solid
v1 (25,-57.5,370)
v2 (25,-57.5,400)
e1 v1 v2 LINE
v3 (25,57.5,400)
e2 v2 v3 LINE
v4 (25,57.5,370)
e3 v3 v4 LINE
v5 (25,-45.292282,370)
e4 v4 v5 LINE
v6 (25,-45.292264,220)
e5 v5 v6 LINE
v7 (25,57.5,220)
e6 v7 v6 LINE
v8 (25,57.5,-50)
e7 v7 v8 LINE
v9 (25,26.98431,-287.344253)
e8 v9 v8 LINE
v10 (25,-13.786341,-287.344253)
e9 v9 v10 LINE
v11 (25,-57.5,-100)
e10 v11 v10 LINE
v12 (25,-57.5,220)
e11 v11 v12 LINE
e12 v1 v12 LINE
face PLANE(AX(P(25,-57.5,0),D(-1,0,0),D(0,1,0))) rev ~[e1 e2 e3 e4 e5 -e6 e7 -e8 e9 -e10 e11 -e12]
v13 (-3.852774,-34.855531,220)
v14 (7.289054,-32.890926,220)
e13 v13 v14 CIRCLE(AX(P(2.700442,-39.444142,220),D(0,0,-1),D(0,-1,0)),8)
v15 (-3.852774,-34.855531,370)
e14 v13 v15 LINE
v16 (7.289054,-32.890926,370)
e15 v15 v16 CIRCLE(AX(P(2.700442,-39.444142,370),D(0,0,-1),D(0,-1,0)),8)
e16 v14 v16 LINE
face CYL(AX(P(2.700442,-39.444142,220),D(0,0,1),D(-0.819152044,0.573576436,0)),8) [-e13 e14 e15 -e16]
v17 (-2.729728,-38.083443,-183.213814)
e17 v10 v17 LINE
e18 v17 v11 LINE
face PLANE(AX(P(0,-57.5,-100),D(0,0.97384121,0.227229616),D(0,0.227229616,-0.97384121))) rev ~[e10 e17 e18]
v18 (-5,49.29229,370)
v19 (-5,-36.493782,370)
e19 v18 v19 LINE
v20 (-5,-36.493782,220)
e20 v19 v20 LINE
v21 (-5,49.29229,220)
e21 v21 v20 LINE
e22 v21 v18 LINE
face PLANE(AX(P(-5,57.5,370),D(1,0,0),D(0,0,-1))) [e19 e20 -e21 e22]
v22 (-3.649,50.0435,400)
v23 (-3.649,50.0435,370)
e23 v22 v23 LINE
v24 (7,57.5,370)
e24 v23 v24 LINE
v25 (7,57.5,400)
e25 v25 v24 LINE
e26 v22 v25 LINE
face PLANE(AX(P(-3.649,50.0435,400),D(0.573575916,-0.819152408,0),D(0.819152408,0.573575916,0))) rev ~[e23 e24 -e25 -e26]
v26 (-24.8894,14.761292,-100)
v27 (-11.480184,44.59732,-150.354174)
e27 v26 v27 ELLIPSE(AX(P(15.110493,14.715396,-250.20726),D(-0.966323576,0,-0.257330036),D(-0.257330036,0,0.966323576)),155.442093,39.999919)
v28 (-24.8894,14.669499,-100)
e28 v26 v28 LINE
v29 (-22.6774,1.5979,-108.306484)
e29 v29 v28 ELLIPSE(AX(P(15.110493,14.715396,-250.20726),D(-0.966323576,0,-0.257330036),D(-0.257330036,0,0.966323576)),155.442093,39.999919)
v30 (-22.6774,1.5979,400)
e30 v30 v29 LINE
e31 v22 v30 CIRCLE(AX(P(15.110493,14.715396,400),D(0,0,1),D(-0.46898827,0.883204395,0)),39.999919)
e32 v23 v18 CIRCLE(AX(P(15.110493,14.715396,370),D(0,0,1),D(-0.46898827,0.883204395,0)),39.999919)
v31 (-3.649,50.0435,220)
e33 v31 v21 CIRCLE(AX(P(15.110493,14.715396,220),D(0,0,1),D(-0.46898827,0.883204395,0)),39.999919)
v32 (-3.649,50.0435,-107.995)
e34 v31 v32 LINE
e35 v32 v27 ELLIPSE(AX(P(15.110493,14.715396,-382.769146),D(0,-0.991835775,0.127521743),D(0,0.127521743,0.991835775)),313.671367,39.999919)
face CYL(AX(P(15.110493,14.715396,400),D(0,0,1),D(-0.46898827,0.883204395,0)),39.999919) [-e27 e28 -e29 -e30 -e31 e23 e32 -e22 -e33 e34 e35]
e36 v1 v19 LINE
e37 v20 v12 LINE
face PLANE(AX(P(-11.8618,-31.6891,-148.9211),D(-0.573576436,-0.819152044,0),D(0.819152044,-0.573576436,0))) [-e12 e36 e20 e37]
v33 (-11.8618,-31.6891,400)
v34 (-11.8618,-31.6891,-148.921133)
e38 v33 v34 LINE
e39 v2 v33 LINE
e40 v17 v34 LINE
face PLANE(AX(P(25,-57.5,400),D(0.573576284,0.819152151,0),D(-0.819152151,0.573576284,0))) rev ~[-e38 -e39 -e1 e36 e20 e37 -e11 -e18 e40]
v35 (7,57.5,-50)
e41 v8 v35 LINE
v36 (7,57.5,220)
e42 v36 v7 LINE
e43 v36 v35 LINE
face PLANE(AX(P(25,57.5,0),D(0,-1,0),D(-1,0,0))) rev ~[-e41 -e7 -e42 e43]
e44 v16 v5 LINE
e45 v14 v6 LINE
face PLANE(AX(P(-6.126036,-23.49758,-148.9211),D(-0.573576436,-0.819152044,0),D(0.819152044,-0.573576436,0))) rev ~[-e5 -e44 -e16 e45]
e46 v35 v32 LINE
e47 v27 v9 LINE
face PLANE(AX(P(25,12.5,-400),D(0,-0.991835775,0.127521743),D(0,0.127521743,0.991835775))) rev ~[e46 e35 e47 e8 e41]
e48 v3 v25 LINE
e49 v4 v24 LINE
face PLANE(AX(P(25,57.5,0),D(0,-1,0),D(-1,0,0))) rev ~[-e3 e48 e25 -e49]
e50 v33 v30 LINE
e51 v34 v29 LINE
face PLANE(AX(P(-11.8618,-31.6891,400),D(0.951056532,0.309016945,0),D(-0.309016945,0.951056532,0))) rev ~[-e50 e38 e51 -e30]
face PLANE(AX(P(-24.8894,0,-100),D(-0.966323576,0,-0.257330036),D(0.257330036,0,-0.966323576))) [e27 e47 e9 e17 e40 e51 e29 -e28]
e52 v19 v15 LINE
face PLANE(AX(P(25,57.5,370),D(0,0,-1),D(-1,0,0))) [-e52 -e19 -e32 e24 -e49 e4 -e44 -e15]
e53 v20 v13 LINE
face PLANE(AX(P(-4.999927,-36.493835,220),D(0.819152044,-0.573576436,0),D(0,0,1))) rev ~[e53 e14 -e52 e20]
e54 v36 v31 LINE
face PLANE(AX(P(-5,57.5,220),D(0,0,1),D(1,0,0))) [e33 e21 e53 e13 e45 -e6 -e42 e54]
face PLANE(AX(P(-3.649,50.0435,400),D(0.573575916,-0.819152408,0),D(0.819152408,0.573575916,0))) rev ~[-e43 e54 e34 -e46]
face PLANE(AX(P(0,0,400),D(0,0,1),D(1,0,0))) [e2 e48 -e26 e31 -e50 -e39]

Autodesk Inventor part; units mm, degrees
ref_plane "YZ Plane" through (0, 0, 0) normal (1, 0, 0) x (0, 1, 0)
ref_plane "XZ Plane" through (0, 0, 0) normal (0, 1, 0) x (-1, 0, 0)
ref_plane "XY Plane" through (0, 0, 0) normal (0, 0, 1) x (1, 0, 0)
sketch "Sketch1" plane through (0, 0, 0) normal (0, 0, 1) x (1, 0, 0)
  line L0 (-25, -57.5) -> (25, -57.5)
  line L1 (25, -57.5) -> (25, 57.5)
  line L2 (25, 57.5) -> (-25, 57.5)
  line L3 (-25, 57.5) -> (-25, -57.5)
  line L4 (-25, -57.5) -> (25, 57.5) construction
  line L5 (25, -57.5) -> (-25, 57.5) construction
  point P0 (0, 0)
  dimension "d0" = 50
  dimension "d1" = 115
extrude "Extrusion1" add sketch "Sketch1" along normal mid plane 800
sketch "Sketch2" plane through (0, 0, 400) normal (0, 0, 1) x (1, 0, 0)
  line L0 (-25, -57.5) -> (25, -57.5) projected
  line L1 (25, -57.5) -> (25, 57.5) construction
  line L2 (25, 57.5) -> (-25, 57.5) projected
  line L3 (-25, 57.5) -> (-25, -57.5) projected
  line L4 (25, -57.5) -> (86.0387, -57.5) construction
  line L5 (-25, -57.5) -> (25, -57.5) projected
  line L6 (25, -57.5) -> (-11.8618, -31.6891)
  line L7 (25, -57.5) -> (70, -57.5) construction
  line L8 (-11.8618, -31.6891) -> (-22.6774, 1.5979)
  line L9 (-11.8618, -31.6891) -> (23.1382, -31.6891) construction
  arc A0 (-3.649, 50.0435) -> (-22.6774, 1.5979) centre (15.1106, 14.7153) ccw
  line L10 (-3.649, 50.0435) -> (7, 57.5)
  line L11 (-3.649, 50.0435) -> (9.351, 50.0435) construction
  line L12 (25, 57.5) -> (-25, 57.5) projected
  point P0 (0, 0)
  dimension "d5" = 45
  dimension "d6" = 145
  dimension "d7" = 35
  dimension "d8" = 108
  dimension "d9" = 40
  dimension "d10" = 13
  dimension "d11" = 35
  dimension "d12" = 18
extrude "Extrusion2" cut sketch "Sketch2" against normal through all
sketch "Sketch3" plane through (0, 0, 0) normal (1, 0, 0) x (0, 1, 0)
  line L0 (57.5, -400) -> (57.5, 400) projected
  line L1 (-57.5, 400) -> (57.5, 400) projected
  line L2 (-57.5, -400) -> (-57.5, 400) projected
  line L3 (57.5, -400) -> (-57.5, -400) projected
  line L4 (-57.5, -400) -> (-57.5, 400) projected
  line L5 (-57.5, -100) -> (12.5, -400)
  line L6 (57.5, -400) -> (-57.5, -400) projected
  point P0 (0, 0)
  dimension "d15" = 300
  dimension "d16" = 70
extrude "Extrusion3" cut sketch "Sketch3" along normal through all both and the other way through all contours L3 L2 L5
sketch "Sketch4" plane through (25, 57.5, 400) normal (1, 0, 0) x (0, 0, -1)
  line L0 (500, -115) -> (800, -45) projected
  line L1 (800, 0) -> (800, -45) projected
  line L2 (800, 0) -> (0, 0) projected
  line L3 (0, -115) -> (0, 0) projected
  line L4 (500, -115) -> (0, -115) projected
  line L5 (800, -45) -> (450, 0)
  point P0 (400, -57.5)
  dimension "d19" = 350
extrude "Extrusion4" cut sketch "Sketch4" along normal through all both and the other way through all contours L5 L2 L1
sketch "Sketch5" plane through (0, 0, 0) normal (0, 1, 0) x (-1, 0, 0)
  line L0 (-25, -100) -> (-25, -400) projected
  line L1 (24.8894, -382.7696) -> (24.8894, 400) projected
  line L2 (-25, -400) -> (24.8894, -400)
  line L3 (24.8894, -400) -> (24.8894, 400)
  line L4 (-25, 400) -> (-25, -400)
  line L5 (-7, 400) -> (3.649, 400) projected
  line L6 (24.8894, -100) -> (-55, -400)
  line L7 (-55, -400) -> (-25, -400)
  point P0 (0, 0)
  point P1 (-0.0553, 400)
  dimension "d22" = 30
  dimension "d23" = 300
extrude "Extrusion5" cut sketch "Sketch5" along normal through all both and the other way through all
sketch "Sketch6" plane through (7, 57.5, 400) normal (0, 1, 0) x (1, 0, 0)
  line L0 (18, 500) -> (18, 0) projected
  line L1 (18, 30) -> (-12, 30)
  line L2 (-12, 30) -> (-12, 180)
  line L3 (-12, 180) -> (18, 180)
  line L4 (18, 180) -> (18, 30)
  line L5 (18, 0) -> (0, 0) projected
  point P0 (-7, 400)
  dimension "d26" = 30
  dimension "d27" = 150
  dimension "d28" = 30
extrude "Extrusion6" cut sketch "Sketch6" against normal through all
sketch "Sketch7" plane through (-11.8618, -31.6891, -148.9211) normal (-0.5735764, -0.819152, 0) x (0.819152, -0.5735764, 0)
  line L0 (-40.8281, 518.9211) -> (8.3768, 518.9211) projected
  line L1 (-20.9613, 368.9211) -> (45, 368.9211) projected
  line L2 (8.3768, 518.9211) -> (45, 518.9211)
  line L3 (45, 518.9211) -> (45, 368.9211)
  line L4 (45, 368.9211) -> (8.3768, 368.9211)
  line L5 (8.3768, 368.9211) -> (8.3768, 518.9211)
  point P0 (-8.4594, 148.9211)
extrude "Extrusion7" add sketch "Sketch7" against normal blind 10
fillet "Fillet1" radius 8 1 edges at (0.7358, -28.3023, 295)
sketch "Sketch8" plane through (25, -57.5, 370) normal (0, 0, 1) x (1, 0, 0)
  line L0 (0, 0) -> (0, 12.2077) projected
  line L1 (0, 0) -> (5.7358, 8.1915) projected
  line L2 (0, 12.2077) -> (5.7358, 8.1915) projected
  point P0 (-25, 57.5)
extrude "Extrusion8" cut sketch "Sketch8" against normal through all
properties part number "bodyside"
